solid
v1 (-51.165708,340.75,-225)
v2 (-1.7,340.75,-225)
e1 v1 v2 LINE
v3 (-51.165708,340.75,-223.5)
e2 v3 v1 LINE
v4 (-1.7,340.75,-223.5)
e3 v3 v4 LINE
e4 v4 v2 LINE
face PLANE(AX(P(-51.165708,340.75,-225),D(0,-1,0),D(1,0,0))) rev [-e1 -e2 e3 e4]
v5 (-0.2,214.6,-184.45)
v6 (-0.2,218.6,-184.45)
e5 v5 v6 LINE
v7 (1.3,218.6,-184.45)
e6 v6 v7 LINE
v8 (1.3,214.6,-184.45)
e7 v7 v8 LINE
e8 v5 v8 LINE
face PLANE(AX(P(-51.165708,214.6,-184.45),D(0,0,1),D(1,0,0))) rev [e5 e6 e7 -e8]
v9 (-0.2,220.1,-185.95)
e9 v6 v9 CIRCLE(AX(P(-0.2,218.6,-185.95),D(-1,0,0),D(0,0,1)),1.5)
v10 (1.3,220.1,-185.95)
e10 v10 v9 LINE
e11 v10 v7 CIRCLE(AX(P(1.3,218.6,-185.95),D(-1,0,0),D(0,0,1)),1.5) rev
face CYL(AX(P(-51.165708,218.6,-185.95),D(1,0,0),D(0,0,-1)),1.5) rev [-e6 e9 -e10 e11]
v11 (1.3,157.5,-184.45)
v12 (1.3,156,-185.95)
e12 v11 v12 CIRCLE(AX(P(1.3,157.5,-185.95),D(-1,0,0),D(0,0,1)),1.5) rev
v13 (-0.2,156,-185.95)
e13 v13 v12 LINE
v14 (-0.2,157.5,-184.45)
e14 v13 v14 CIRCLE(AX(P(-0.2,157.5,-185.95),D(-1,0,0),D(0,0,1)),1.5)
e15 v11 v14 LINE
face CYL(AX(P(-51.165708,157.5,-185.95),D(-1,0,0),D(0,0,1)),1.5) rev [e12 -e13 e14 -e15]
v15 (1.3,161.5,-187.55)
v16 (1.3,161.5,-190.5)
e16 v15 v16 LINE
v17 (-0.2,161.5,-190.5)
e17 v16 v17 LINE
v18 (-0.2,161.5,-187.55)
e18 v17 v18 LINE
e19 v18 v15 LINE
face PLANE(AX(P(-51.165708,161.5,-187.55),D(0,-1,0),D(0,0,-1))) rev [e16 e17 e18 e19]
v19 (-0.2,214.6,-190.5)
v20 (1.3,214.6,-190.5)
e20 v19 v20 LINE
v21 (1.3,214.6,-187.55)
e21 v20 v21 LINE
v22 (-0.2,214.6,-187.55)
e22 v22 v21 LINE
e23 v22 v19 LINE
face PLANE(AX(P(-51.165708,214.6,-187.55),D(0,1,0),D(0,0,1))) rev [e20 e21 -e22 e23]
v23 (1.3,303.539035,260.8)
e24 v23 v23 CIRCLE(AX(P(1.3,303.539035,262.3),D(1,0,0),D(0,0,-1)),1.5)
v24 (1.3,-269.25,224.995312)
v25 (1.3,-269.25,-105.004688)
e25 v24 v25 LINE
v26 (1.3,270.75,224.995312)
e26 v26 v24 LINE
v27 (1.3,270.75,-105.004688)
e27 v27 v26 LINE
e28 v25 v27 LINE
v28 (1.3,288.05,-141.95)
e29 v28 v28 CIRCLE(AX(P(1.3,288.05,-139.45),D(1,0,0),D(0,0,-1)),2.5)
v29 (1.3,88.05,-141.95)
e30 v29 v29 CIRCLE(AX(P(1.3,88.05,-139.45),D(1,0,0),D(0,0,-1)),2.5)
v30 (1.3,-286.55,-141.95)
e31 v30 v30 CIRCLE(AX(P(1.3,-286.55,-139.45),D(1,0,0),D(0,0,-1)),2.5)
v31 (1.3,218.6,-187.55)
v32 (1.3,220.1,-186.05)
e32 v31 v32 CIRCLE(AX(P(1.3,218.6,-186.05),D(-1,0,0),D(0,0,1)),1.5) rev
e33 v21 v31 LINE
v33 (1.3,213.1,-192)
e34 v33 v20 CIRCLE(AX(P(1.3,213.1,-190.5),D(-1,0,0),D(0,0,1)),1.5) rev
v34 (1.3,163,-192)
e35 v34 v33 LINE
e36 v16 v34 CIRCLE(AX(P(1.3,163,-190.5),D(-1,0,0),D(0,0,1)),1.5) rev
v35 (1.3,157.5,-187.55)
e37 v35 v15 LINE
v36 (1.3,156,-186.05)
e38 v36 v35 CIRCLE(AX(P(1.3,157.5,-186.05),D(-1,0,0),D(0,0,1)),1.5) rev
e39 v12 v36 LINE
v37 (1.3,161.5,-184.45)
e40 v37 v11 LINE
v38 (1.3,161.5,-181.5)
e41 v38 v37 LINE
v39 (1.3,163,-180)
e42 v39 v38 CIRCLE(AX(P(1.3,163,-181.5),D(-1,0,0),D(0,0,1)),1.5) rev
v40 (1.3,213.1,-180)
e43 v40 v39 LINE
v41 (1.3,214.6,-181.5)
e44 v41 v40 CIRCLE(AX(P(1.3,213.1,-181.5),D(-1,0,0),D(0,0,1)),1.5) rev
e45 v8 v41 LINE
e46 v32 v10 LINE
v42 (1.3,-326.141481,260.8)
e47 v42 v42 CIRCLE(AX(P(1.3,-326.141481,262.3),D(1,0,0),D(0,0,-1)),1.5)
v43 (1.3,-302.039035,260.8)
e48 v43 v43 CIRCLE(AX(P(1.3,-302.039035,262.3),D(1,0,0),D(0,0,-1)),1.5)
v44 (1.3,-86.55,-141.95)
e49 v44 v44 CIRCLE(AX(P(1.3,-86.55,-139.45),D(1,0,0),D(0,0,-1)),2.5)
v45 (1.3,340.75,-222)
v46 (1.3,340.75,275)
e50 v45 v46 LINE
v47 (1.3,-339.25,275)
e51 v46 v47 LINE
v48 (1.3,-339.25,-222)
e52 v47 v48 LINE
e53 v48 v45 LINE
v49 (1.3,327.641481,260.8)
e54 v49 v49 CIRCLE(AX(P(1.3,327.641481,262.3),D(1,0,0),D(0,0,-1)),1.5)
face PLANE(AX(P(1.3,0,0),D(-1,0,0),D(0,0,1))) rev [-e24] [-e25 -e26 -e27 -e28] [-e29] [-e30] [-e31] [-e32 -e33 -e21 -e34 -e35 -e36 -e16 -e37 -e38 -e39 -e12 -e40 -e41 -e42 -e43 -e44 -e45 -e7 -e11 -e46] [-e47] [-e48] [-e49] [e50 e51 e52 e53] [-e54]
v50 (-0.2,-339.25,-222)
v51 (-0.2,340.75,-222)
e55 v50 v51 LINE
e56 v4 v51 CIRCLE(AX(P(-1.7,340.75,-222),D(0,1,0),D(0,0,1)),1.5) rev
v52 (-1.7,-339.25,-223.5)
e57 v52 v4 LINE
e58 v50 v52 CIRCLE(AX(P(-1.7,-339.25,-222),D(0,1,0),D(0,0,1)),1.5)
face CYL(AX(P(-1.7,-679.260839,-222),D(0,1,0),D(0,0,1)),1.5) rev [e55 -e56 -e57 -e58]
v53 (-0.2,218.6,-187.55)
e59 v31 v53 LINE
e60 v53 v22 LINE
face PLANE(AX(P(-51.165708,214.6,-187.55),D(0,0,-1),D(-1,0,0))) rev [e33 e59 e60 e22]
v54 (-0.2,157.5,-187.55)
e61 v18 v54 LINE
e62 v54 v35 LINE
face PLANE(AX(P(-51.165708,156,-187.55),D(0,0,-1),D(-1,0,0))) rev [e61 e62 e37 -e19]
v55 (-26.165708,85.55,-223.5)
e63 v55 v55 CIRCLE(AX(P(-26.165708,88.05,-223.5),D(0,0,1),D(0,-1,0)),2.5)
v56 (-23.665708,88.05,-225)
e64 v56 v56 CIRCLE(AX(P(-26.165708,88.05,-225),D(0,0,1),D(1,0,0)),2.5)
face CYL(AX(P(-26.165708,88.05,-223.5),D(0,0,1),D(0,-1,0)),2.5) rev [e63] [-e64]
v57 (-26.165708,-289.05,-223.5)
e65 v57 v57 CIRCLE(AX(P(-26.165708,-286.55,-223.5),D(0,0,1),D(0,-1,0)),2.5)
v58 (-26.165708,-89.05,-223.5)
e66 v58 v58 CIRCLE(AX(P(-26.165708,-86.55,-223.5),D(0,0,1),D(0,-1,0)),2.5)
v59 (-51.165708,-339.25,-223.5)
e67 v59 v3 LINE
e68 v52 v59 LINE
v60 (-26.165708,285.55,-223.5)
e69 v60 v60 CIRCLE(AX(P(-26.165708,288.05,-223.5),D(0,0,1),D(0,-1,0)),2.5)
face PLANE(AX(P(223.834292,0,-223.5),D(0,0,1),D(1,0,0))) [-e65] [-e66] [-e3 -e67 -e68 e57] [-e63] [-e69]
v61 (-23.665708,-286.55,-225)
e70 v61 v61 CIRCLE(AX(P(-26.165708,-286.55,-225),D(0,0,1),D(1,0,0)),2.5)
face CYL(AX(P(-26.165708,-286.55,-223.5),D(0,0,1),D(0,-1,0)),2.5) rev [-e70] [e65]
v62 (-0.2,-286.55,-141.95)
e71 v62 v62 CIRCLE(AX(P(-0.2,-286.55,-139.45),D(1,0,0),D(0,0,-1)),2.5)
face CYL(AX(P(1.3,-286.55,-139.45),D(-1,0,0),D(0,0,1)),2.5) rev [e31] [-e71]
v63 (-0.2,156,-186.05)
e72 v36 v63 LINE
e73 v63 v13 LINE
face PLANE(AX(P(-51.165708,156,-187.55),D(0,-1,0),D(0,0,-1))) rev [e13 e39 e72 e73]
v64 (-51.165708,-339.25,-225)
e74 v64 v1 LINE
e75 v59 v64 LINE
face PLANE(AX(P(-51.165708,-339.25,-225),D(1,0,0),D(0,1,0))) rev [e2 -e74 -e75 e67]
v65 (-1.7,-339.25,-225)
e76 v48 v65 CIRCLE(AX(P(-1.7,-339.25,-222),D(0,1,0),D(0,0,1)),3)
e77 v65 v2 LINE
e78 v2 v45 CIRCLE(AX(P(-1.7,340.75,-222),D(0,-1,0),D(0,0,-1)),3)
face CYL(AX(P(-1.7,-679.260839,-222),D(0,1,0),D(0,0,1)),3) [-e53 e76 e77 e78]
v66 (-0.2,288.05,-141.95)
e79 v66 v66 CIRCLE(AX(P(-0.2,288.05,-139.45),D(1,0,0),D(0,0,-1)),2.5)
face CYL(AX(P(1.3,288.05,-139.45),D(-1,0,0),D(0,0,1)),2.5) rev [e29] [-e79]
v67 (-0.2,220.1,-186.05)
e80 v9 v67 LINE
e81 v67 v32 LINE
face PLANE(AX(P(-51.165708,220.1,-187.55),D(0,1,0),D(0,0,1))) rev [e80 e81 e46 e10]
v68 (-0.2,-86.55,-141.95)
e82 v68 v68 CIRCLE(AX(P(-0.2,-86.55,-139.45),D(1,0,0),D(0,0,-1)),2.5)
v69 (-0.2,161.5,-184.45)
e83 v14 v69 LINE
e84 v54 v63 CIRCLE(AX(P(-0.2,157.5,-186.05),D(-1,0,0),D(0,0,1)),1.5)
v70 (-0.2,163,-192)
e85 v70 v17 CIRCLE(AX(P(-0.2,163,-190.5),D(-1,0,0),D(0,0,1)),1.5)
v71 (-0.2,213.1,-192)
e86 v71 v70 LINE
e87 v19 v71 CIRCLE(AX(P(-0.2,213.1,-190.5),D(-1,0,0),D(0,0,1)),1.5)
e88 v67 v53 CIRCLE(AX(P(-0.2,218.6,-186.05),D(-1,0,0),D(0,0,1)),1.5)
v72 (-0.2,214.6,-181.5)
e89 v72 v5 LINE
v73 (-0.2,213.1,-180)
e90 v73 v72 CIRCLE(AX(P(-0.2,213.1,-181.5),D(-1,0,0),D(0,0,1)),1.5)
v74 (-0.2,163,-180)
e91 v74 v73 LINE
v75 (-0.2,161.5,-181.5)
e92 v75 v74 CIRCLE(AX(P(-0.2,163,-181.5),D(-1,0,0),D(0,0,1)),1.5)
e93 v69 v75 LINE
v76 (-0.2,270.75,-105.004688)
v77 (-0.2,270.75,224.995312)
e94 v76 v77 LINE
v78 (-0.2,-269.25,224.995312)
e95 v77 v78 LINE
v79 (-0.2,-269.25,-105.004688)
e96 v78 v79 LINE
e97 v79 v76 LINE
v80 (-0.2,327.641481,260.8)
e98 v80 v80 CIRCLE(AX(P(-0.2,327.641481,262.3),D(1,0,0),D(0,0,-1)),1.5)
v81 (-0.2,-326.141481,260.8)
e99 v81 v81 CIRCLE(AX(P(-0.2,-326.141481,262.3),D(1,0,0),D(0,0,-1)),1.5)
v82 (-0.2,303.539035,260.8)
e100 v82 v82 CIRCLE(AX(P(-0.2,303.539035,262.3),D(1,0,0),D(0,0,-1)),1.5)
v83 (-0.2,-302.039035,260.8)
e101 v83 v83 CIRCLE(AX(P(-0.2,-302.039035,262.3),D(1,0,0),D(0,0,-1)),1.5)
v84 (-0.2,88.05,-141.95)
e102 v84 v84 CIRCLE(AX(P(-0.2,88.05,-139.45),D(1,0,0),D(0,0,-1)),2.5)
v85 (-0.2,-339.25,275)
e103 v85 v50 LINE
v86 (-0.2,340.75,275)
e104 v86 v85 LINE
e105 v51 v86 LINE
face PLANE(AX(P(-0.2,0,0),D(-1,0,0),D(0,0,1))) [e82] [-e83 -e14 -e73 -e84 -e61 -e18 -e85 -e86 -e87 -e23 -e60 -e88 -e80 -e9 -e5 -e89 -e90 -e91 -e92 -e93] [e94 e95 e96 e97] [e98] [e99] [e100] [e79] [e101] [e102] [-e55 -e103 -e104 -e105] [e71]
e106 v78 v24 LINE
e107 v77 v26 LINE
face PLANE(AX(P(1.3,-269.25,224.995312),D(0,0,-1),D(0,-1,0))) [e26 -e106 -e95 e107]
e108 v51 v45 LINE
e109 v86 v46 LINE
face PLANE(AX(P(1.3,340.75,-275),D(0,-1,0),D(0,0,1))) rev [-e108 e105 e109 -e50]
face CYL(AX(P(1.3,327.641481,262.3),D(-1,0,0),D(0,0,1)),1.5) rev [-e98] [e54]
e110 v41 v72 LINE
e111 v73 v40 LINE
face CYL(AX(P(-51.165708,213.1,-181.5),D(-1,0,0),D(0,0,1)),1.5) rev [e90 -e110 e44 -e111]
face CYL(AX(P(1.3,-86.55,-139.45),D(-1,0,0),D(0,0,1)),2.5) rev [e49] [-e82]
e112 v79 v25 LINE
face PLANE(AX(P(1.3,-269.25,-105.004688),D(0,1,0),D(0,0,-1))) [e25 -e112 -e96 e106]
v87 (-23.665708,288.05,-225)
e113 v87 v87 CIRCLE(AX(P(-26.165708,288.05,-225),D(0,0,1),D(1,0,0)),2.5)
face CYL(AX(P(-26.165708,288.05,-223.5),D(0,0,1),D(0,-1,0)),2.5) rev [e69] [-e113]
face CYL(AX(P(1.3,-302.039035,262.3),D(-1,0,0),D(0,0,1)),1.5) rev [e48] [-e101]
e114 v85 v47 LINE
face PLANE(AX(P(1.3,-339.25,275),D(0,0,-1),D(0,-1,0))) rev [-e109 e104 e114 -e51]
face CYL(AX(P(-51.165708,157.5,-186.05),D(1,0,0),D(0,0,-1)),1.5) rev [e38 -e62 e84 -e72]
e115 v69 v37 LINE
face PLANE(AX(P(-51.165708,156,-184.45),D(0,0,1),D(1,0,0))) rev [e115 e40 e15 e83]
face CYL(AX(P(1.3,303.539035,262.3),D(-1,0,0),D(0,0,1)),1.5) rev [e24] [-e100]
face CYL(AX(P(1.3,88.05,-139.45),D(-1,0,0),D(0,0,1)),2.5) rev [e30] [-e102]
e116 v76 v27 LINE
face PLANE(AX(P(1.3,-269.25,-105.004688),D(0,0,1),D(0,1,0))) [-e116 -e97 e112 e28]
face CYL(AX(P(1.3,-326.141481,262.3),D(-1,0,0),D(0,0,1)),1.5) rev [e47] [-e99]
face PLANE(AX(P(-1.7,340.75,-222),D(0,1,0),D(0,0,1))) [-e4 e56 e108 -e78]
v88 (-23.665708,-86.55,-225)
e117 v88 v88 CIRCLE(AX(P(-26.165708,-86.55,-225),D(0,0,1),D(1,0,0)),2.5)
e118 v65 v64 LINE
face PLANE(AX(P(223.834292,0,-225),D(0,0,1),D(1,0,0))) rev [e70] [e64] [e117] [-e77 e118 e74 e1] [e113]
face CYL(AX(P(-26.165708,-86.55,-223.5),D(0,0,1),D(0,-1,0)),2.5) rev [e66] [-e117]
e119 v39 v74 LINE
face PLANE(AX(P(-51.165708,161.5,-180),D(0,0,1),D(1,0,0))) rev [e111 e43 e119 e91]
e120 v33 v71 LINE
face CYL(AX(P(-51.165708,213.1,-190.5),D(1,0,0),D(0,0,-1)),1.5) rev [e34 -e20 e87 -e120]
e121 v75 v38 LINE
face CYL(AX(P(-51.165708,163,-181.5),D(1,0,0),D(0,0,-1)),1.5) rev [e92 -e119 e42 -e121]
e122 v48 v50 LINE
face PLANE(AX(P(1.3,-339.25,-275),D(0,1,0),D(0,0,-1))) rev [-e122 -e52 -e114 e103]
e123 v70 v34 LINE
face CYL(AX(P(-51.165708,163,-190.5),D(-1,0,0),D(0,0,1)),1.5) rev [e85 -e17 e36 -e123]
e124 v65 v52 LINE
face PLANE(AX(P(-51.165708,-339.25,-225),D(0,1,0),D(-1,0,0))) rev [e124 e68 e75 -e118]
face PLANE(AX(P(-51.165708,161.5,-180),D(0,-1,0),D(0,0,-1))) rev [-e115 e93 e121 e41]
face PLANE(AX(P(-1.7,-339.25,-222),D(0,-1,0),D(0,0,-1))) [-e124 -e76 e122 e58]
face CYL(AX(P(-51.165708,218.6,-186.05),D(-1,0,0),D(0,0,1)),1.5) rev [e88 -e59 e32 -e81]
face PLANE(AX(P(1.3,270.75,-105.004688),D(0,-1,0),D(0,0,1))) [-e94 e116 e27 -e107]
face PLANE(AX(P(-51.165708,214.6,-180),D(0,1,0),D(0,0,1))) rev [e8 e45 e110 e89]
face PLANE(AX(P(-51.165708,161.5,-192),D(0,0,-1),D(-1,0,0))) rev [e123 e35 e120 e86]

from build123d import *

# Parameters (mm, degrees)
SKETCH1_W                  = 680
SKETCH1_H                  = 550
SKETCH1_R                  = 1.5
BOSS_EXTRUDE1_DEPTH        = 1.3
SKETCH3_W                  = 540
SKETCH3_H                  = 330
CUT_EXTRUDE1_DEPTH         = 438.878125167
F_5_0_5_DIAMETER_HOLE1_D   = 5
CONVERT_SOLID1_START       = -0.2
CONVERT_SOLID1_OUTLINE_W   = 680
CONVERT_SOLID1_OUTLINE_H   = 550
CONVERT_SOLID1_OUTLINE_R   = 2.5
CONVERT_SOLID1_OUTLINE_R_2 = 1.5
CONVERT_SOLID1_OUTLINE_W_2 = 540
CONVERT_SOLID1_OUTLINE_H_2 = 330
CONVERT_SOLID1_DEPTH       = 0.2
SKETCHED_START             = -339.25
SKETCHED_BEND1_DEPTH       = 680
SKETCHED_BEND1_2_DEPTH     = 680
F_5_0_5_DIAMETER_HOLE2_D   = 5
CUT_EXTRUDE2_DEPTH         = 442.008177978
FILLET4_R                  = 1.5
FILLET5_R                  = 1.5
FILLET6_R                  = 1.5
FILLET7_R                  = 1.5
FILLET8_R                  = 1.5
FILLET9_R                  = 1.5
FILLET10_R                 = 1.5
FILLET11_R                 = 1.5


# Read off the part's stored shape, not the designer's step: Convert-Solid1, Sketched Bend1
with BuildPart() as part:
    # Sketch1 → Boss-Extrude1 (new body)
    with BuildSketch(Plane.YZ):
        with Locations((0.75, 0)):
            Rectangle(SKETCH1_W, SKETCH1_H)
        with Locations(Location((-326.141480577, 262.3, 0), (0, 0, 270))):
            Circle(SKETCH1_R, mode=Mode.SUBTRACT)
        with Locations(Location((-302.039034574, 262.3, 0), (0, 0, 270))):
            Circle(SKETCH1_R, mode=Mode.SUBTRACT)
        with Locations(Location((327.641480577, 262.3, 0), (0, 0, 270))):
            Circle(SKETCH1_R, mode=Mode.SUBTRACT)
        with Locations(Location((303.539034574, 262.3, 0), (0, 0, 270))):
            Circle(SKETCH1_R, mode=Mode.SUBTRACT)
    extrude(amount=BOSS_EXTRUDE1_DEPTH)

    # Sketch3 → Cut-Extrude1 (cut, through all)
    with BuildSketch(Plane.YZ.offset(1.3)):
        with Locations((0.75, 59.995312317)):
            Rectangle(SKETCH3_W, SKETCH3_H)
    extrude(amount=-CUT_EXTRUDE1_DEPTH, mode=Mode.SUBTRACT)

    # Ø5.0 (5) Diameter Hole1 (through all)
    with Locations(Plane.YZ.offset(1.3)):
        with Locations((288.05, -139.45), (-286.55, -139.45), (-86.55, -139.45), (88.05, -139.45)):
            Hole(F_5_0_5_DIAMETER_HOLE1_D / 2)

    # Convert-Solid1 outline → Convert-Solid1 (add)
    with BuildSketch(Plane.YZ.offset(CONVERT_SOLID1_START)):
        with Locations((0.75, 0)):
            Rectangle(CONVERT_SOLID1_OUTLINE_W, CONVERT_SOLID1_OUTLINE_H)
        with Locations((-286.55, -139.45)):
            Circle(CONVERT_SOLID1_OUTLINE_R, mode=Mode.SUBTRACT)
        with Locations((-86.55, -139.45)):
            Circle(CONVERT_SOLID1_OUTLINE_R, mode=Mode.SUBTRACT)
        with Locations((88.05, -139.45)):
            Circle(CONVERT_SOLID1_OUTLINE_R, mode=Mode.SUBTRACT)
        with Locations((288.05, -139.45)):
            Circle(CONVERT_SOLID1_OUTLINE_R, mode=Mode.SUBTRACT)
        with Locations((-326.141480577, 262.3)):
            Circle(CONVERT_SOLID1_OUTLINE_R_2, mode=Mode.SUBTRACT)
        with Locations((-302.039034574, 262.3)):
            Circle(CONVERT_SOLID1_OUTLINE_R_2, mode=Mode.SUBTRACT)
        with Locations((0.75, 59.995312317)):
            Rectangle(CONVERT_SOLID1_OUTLINE_W_2, CONVERT_SOLID1_OUTLINE_H_2, mode=Mode.SUBTRACT)
        with Locations((303.539034574, 262.3)):
            Circle(CONVERT_SOLID1_OUTLINE_R_2, mode=Mode.SUBTRACT)
        with Locations((327.641480577, 262.3)):
            Circle(CONVERT_SOLID1_OUTLINE_R_2, mode=Mode.SUBTRACT)
    extrude(amount=CONVERT_SOLID1_DEPTH)

    # Sketched Bend1 outline → Sketched Bend1 (cut)
    with BuildSketch(Plane(origin=(0, 0, 0), x_dir=(1, 0, 0), z_dir=(0, 1, 0)).offset(SKETCHED_START)):
        with BuildLine():
            Line((-0.2, 275), (-0.2, 224.598076212))
            ThreePointArc((-0.2, 224.598076212), (0.898076212, 223.5), (1.3, 222))
            Line((1.3, 222), (1.3, 275))
            Line((1.3, 275), (-0.2, 275))
        make_face()
    extrude(amount=SKETCHED_BEND1_DEPTH, mode=Mode.SUBTRACT)

    # Sketched Bend1 2 outline → Sketched Bend1 2 (add)
    with BuildSketch(Plane(origin=(0, 0, 0), x_dir=(1, 0, 0), z_dir=(0, 1, 0)).offset(SKETCHED_START)):
        with BuildLine():
            Line((-51.165708265, 225), (-51.165708265, 223.5))
            Line((-51.165708265, 223.5), (-1.7, 223.5))
            ThreePointArc((-1.7, 223.5), (-0.639339828, 223.060660172), (-0.2, 222))
            Line((-0.2, 222), (-0.2, 224.598076212))
            ThreePointArc((-0.2, 224.598076212), (-0.923542865, 224.897777479), (-1.7, 225))
            Line((-1.7, 225), (-51.165708265, 225))
        make_face()
    extrude(amount=SKETCHED_BEND1_2_DEPTH)

    # Ø5.0 (5) Diameter Hole2 (through all)
    with Locations(Plane(origin=(0, 0, -223.5), x_dir=(0, -1, 0), z_dir=(0, 0, 1))):
        with Locations((-288.05, -26.165708265), (-88.05, -26.165708265), (86.55, -26.165708265), (286.55, -26.165708265)):
            Hole(F_5_0_5_DIAMETER_HOLE2_D / 2)

    # Sketch15 → Cut-Extrude2 (cut, through all)
    with BuildSketch(Plane.YZ.offset(1.3)):
        Polygon((161.5, -180), (214.6, -180), (214.6, -184.45), (220.1, -184.45), (220.1, -187.55), (214.6, -187.55), (214.6, -192), (161.5, -192), (161.5, -187.55), (156, -187.55), (156, -184.45), (161.5, -184.45), align=None)
    extrude(amount=-CUT_EXTRUDE2_DEPTH, mode=Mode.SUBTRACT)

    # Fillet4
    fillet4_edges = [part.edges().sort_by_distance(p)[0] for p in [
        (0.55, 161.5, -180),
    ]]
    fillet(fillet4_edges, radius=FILLET4_R)

    # Fillet5
    fillet5_edges = [part.edges().sort_by_distance(p)[0] for p in [
        (0.55, 214.6, -180),
    ]]
    fillet(fillet5_edges, radius=FILLET5_R)

    # Fillet6
    fillet6_edges = [part.edges().sort_by_distance(p)[0] for p in [
        (0.55, 220.1, -184.45),
    ]]
    fillet(fillet6_edges, radius=FILLET6_R)

    # Fillet7
    fillet7_edges = [part.edges().sort_by_distance(p)[0] for p in [
        (0.55, 220.1, -187.55),
    ]]
    fillet(fillet7_edges, radius=FILLET7_R)

    # Fillet8
    fillet8_edges = [part.edges().sort_by_distance(p)[0] for p in [
        (0.55, 214.6, -192),
    ]]
    fillet(fillet8_edges, radius=FILLET8_R)

    # Fillet9
    fillet9_edges = [part.edges().sort_by_distance(p)[0] for p in [
        (0.55, 161.5, -192),
    ]]
    fillet(fillet9_edges, radius=FILLET9_R)

    # Fillet10
    fillet10_edges = [part.edges().sort_by_distance(p)[0] for p in [
        (0.55, 156, -184.45),
    ]]
    fillet(fillet10_edges, radius=FILLET10_R)

    # Fillet11
    fillet11_edges = [part.edges().sort_by_distance(p)[0] for p in [
        (0.55, 156, -187.55),
    ]]
    fillet(fillet11_edges, radius=FILLET11_R)


solid = part.part
